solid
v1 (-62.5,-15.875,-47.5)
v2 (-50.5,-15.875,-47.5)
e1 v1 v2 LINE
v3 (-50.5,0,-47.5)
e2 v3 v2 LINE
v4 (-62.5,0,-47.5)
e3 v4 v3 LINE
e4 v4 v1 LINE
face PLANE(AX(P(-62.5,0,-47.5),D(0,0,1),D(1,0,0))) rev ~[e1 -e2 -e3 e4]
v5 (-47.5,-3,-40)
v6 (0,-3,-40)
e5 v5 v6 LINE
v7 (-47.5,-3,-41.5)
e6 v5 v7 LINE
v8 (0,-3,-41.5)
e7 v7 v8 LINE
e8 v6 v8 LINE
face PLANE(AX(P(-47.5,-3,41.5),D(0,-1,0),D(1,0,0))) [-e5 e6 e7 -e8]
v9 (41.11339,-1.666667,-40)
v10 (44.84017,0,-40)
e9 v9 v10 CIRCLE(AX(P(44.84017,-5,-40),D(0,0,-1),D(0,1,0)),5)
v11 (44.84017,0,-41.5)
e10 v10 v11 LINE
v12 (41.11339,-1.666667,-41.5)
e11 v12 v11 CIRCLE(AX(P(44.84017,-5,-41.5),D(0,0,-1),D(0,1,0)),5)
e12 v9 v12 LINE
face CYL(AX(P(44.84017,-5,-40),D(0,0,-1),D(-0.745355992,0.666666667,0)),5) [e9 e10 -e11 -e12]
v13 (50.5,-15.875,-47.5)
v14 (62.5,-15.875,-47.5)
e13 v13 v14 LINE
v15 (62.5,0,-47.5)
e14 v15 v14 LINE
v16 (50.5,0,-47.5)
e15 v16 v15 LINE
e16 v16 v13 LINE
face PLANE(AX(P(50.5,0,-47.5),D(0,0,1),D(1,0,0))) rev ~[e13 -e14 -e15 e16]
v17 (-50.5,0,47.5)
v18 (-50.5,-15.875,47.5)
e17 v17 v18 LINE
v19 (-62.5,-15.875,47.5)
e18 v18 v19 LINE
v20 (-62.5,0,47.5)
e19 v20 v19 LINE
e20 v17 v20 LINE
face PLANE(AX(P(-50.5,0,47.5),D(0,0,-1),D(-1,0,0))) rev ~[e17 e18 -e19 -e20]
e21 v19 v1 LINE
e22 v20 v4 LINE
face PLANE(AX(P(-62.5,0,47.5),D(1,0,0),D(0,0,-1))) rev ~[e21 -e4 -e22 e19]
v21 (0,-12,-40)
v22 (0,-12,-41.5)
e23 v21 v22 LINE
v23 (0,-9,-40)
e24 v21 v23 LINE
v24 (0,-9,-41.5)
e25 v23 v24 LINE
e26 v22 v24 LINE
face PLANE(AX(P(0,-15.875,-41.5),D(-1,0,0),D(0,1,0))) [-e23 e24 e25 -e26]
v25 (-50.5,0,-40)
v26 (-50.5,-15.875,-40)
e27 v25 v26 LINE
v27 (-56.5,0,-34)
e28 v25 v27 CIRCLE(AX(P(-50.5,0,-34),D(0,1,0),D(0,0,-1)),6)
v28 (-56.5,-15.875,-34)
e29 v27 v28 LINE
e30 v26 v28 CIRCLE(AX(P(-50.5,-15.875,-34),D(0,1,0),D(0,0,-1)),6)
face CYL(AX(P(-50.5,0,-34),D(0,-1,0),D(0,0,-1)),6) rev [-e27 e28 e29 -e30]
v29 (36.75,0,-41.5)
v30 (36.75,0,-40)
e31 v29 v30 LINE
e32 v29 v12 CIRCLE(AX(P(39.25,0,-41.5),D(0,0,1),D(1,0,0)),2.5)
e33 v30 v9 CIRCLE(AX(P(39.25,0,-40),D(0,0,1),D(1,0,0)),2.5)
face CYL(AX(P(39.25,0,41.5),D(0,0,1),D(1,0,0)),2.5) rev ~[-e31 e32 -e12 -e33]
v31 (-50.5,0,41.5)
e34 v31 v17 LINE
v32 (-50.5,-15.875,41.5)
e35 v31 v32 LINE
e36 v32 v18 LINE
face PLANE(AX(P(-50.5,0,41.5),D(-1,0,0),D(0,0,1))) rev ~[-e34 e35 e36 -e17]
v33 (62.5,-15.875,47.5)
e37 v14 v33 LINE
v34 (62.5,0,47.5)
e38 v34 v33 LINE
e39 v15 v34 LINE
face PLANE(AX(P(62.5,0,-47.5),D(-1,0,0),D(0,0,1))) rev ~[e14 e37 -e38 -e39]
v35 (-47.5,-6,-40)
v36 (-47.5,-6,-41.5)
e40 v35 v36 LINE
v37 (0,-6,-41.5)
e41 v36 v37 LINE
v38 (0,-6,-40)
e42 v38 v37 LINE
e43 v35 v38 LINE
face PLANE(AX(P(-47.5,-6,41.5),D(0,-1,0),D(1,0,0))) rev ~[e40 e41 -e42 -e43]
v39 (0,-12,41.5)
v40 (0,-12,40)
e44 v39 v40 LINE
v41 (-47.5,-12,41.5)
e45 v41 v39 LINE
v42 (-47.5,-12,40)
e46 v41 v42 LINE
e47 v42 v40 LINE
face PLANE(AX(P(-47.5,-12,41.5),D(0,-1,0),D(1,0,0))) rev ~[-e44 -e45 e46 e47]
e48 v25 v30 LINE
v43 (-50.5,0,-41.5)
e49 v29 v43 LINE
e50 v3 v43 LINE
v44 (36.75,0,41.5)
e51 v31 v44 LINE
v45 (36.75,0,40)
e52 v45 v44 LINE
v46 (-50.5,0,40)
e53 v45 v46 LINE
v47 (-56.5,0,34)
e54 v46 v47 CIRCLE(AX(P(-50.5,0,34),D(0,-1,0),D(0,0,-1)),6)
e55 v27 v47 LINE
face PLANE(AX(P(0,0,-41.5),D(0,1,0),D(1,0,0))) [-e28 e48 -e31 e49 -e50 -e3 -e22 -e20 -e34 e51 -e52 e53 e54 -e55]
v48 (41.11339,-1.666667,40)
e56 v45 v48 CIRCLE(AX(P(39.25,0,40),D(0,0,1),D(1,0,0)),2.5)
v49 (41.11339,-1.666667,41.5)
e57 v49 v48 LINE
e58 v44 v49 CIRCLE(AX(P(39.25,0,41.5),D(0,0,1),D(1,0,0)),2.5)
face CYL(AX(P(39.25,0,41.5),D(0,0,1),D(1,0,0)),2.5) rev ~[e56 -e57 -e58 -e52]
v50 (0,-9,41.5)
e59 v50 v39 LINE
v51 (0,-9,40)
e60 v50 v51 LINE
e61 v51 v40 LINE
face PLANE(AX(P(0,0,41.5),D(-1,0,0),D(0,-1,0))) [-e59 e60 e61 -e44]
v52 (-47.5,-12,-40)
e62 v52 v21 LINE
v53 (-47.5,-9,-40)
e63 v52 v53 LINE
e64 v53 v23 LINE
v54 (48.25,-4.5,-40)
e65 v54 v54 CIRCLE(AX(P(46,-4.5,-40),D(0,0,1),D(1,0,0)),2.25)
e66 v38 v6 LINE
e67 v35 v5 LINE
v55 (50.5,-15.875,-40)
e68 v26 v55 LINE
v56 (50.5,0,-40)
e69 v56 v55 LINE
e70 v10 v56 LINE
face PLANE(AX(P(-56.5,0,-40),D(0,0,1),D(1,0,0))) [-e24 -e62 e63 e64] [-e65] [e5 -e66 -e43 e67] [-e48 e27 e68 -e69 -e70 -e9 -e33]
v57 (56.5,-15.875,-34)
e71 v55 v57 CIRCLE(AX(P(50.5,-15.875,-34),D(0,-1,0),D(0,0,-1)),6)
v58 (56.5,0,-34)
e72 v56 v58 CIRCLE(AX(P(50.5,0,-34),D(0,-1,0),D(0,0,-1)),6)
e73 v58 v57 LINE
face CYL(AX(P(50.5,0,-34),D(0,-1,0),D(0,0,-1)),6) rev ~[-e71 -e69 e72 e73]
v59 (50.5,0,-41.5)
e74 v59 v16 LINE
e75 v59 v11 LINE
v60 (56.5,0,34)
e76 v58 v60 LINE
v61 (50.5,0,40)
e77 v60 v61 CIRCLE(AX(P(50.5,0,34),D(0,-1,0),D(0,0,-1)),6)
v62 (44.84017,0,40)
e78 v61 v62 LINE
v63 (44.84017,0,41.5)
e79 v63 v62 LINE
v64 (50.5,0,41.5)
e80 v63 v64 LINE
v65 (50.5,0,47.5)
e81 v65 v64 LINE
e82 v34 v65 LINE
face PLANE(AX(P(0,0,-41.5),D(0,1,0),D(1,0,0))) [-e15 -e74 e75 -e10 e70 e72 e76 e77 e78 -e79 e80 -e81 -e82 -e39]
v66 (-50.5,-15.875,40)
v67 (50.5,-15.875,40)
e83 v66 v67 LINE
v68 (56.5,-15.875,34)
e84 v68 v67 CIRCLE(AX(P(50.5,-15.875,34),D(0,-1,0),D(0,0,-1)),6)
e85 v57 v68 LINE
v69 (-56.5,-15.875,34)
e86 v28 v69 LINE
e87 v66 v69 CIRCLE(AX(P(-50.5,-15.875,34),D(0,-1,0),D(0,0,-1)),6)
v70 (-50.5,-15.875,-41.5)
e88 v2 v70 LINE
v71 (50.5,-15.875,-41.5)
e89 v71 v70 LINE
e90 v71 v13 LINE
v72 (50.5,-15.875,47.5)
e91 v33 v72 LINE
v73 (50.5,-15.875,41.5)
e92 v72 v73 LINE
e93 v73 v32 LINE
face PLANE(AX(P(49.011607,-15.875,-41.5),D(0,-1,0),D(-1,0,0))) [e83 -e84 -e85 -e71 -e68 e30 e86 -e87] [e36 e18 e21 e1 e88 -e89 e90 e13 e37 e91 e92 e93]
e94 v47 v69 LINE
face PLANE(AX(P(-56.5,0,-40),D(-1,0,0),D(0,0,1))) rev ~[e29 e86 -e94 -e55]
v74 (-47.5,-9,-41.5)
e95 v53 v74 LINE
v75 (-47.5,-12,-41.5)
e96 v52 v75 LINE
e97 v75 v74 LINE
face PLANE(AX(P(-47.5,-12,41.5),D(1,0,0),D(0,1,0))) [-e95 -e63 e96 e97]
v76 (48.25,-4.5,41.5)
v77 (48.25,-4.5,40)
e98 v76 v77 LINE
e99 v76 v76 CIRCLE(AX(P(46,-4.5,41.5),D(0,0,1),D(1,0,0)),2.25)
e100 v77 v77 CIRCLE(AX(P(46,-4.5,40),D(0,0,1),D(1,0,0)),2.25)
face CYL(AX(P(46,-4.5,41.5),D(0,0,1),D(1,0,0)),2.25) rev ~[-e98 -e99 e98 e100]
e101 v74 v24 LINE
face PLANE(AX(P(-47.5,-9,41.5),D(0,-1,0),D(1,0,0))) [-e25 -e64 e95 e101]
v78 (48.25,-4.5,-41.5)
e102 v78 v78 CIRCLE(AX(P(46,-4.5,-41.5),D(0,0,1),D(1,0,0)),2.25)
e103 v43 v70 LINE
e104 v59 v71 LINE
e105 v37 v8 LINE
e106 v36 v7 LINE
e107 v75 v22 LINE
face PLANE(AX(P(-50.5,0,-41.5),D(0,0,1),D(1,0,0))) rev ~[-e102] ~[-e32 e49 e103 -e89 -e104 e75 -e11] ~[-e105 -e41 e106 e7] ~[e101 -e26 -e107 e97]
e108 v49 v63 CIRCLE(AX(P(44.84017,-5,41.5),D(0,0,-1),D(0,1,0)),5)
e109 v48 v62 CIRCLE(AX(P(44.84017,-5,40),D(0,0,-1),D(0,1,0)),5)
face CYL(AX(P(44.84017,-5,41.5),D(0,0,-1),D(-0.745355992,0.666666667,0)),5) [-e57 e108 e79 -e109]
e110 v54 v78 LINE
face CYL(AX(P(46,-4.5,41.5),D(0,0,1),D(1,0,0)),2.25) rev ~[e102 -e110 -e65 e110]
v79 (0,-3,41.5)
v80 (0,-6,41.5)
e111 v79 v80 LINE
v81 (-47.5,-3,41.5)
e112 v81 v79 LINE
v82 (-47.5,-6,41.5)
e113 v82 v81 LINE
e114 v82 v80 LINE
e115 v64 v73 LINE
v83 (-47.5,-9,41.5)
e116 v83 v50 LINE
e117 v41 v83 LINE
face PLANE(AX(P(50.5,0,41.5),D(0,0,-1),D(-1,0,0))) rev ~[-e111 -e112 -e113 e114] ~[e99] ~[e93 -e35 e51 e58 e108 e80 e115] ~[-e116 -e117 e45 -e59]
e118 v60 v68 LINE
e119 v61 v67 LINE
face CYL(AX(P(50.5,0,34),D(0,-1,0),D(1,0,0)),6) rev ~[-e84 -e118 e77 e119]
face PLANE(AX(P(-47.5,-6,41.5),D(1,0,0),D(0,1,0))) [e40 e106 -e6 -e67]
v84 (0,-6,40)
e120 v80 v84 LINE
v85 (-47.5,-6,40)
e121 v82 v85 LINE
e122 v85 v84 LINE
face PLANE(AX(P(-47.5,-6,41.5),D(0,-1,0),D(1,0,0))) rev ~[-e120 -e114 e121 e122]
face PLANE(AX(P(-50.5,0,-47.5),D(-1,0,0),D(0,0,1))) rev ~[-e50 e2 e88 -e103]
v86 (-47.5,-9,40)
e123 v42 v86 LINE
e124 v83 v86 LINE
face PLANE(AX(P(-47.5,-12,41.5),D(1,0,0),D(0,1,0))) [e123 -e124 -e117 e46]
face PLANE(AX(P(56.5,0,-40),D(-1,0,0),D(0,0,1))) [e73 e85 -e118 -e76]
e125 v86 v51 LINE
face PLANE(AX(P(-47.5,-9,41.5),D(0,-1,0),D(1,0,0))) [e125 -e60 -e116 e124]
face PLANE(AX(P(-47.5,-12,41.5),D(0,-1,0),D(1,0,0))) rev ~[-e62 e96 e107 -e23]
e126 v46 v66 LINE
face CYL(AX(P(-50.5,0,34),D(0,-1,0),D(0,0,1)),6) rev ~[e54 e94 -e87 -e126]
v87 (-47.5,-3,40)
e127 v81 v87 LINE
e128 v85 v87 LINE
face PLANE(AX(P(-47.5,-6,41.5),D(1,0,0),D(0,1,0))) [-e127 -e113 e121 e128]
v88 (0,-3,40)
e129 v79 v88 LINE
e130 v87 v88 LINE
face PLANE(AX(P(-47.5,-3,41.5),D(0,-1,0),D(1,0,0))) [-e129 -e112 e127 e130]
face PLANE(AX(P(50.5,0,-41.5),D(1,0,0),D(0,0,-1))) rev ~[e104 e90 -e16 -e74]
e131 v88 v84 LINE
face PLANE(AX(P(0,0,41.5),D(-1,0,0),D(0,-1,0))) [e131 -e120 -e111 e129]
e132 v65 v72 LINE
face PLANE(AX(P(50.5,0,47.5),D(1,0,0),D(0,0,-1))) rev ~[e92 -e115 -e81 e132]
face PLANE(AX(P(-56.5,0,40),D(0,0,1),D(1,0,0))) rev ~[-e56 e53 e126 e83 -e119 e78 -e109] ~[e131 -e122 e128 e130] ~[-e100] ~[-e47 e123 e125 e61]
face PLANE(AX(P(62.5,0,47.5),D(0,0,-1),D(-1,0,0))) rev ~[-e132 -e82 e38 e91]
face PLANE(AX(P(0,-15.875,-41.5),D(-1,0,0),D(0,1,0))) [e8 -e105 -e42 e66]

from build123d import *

# Parameters (mm, degrees)
F0_W      = 113
F0_H      = 80
F1_DEPTH  = 15.875
F2_R      = 6
F3_W      = 89
F3_H      = 3
F3_W_2    = 95
F3_R      = 1.5
F4_DEPTH  = 132
F5_W      = 42.9403819144
F5_H      = 7.4070980772
F6_DEPTH  = 1.5
F7_W      = 42.8083911538
F7_H      = 7.2430414148
F8_DEPTH  = 1.5
F9_R      = 2.5
F10_DEPTH = 92
F11_R     = 2.25
F12_DEPTH = 200
F13_R     = 5


with BuildPart() as f1:
    # F0 (on Front) → F1 (new body)
    with BuildSketch(Plane.XZ):
        Polygon((-50.5, 47.5), (-62.5, 47.5), (-62.5, -47.5), (-50.5, -47.5), (-50.5, -41.5), (50.5, -41.5), (50.5, -47.5), (62.5, -47.5), (62.5, 47.5), (50.5, 47.5), (50.5, 41.5), (-50.5, 41.5), align=None)
        Rectangle(F0_W, F0_H, mode=Mode.SUBTRACT)
    extrude(amount=F1_DEPTH)

    # F2
    f2_edges = [f1.edges().sort_by_distance(p)[0] for p in [
        (56.5, -7.9375, 40),
        (56.5, -7.9375, -40),
        (-56.5, -7.9375, -40),
        (-56.5, -7.9375, 40),
    ]]
    fillet(f2_edges, radius=F2_R)

    # F3 (on face) → F4 (cut)
    with BuildSketch(Plane.XY.offset(41.5)):
        with Locations((-3, -4.5)):
            Rectangle(F3_W, F3_H)
        with Locations((0, -10.5)):
            Rectangle(F3_W_2, F3_H)
        with Locations((46, -4.5)):
            Circle(F3_R)
    extrude(amount=-F4_DEPTH, mode=Mode.SUBTRACT)

    # F5 (on face) → F6 (join)
    with BuildSketch(Plane.XY.offset(41.5)):
        with Locations((21.4701909572, -3.7035490386)):
            Rectangle(F5_W, F5_H)
        Polygon((42.9403819144, -7.4070980772), (0, -7.4070980772), (0, -14.1382440925), (49.1435937583, -14.1382440925), (49.1435937583, -7.4070980772), align=None)
    extrude(amount=-F6_DEPTH)

    # F7 (on face) → F8 (join)
    with BuildSketch(Plane(origin=(0, 0, -41.5), x_dir=(1, 0, 0), z_dir=(0, 0, -1))):
        Polygon((49.0116067231, 15.875), (0, 15.875), (0, 7.2430414148), (42.8083911538, 7.2430414148), (49.0116067231, 7.2430414148), align=None)
        with Locations((21.4041955769, 3.6215207074)):
            Rectangle(F7_W, F7_H)
    extrude(amount=-F8_DEPTH)

    # F9 (on face) → F10 (cut)
    with BuildSketch(Plane.XY.offset(41.5)):
        with Locations((39.25, 0)):
            Circle(F9_R)
    extrude(amount=-F10_DEPTH, mode=Mode.SUBTRACT)

    # F11 (on face) → F12 (cut)
    with BuildSketch(Plane.XY.offset(41.5)):
        with Locations((46, -4.5)):
            Circle(F11_R)
    extrude(amount=-F12_DEPTH, mode=Mode.SUBTRACT)

    # F13
    f13_edges = [f1.edges().sort_by_distance(p)[0] for p in [
        (41.75, 0, 40.75),
        (41.75, 0, -40.75),
    ]]
    fillet(f13_edges, radius=F13_R)


solid = f1.part
